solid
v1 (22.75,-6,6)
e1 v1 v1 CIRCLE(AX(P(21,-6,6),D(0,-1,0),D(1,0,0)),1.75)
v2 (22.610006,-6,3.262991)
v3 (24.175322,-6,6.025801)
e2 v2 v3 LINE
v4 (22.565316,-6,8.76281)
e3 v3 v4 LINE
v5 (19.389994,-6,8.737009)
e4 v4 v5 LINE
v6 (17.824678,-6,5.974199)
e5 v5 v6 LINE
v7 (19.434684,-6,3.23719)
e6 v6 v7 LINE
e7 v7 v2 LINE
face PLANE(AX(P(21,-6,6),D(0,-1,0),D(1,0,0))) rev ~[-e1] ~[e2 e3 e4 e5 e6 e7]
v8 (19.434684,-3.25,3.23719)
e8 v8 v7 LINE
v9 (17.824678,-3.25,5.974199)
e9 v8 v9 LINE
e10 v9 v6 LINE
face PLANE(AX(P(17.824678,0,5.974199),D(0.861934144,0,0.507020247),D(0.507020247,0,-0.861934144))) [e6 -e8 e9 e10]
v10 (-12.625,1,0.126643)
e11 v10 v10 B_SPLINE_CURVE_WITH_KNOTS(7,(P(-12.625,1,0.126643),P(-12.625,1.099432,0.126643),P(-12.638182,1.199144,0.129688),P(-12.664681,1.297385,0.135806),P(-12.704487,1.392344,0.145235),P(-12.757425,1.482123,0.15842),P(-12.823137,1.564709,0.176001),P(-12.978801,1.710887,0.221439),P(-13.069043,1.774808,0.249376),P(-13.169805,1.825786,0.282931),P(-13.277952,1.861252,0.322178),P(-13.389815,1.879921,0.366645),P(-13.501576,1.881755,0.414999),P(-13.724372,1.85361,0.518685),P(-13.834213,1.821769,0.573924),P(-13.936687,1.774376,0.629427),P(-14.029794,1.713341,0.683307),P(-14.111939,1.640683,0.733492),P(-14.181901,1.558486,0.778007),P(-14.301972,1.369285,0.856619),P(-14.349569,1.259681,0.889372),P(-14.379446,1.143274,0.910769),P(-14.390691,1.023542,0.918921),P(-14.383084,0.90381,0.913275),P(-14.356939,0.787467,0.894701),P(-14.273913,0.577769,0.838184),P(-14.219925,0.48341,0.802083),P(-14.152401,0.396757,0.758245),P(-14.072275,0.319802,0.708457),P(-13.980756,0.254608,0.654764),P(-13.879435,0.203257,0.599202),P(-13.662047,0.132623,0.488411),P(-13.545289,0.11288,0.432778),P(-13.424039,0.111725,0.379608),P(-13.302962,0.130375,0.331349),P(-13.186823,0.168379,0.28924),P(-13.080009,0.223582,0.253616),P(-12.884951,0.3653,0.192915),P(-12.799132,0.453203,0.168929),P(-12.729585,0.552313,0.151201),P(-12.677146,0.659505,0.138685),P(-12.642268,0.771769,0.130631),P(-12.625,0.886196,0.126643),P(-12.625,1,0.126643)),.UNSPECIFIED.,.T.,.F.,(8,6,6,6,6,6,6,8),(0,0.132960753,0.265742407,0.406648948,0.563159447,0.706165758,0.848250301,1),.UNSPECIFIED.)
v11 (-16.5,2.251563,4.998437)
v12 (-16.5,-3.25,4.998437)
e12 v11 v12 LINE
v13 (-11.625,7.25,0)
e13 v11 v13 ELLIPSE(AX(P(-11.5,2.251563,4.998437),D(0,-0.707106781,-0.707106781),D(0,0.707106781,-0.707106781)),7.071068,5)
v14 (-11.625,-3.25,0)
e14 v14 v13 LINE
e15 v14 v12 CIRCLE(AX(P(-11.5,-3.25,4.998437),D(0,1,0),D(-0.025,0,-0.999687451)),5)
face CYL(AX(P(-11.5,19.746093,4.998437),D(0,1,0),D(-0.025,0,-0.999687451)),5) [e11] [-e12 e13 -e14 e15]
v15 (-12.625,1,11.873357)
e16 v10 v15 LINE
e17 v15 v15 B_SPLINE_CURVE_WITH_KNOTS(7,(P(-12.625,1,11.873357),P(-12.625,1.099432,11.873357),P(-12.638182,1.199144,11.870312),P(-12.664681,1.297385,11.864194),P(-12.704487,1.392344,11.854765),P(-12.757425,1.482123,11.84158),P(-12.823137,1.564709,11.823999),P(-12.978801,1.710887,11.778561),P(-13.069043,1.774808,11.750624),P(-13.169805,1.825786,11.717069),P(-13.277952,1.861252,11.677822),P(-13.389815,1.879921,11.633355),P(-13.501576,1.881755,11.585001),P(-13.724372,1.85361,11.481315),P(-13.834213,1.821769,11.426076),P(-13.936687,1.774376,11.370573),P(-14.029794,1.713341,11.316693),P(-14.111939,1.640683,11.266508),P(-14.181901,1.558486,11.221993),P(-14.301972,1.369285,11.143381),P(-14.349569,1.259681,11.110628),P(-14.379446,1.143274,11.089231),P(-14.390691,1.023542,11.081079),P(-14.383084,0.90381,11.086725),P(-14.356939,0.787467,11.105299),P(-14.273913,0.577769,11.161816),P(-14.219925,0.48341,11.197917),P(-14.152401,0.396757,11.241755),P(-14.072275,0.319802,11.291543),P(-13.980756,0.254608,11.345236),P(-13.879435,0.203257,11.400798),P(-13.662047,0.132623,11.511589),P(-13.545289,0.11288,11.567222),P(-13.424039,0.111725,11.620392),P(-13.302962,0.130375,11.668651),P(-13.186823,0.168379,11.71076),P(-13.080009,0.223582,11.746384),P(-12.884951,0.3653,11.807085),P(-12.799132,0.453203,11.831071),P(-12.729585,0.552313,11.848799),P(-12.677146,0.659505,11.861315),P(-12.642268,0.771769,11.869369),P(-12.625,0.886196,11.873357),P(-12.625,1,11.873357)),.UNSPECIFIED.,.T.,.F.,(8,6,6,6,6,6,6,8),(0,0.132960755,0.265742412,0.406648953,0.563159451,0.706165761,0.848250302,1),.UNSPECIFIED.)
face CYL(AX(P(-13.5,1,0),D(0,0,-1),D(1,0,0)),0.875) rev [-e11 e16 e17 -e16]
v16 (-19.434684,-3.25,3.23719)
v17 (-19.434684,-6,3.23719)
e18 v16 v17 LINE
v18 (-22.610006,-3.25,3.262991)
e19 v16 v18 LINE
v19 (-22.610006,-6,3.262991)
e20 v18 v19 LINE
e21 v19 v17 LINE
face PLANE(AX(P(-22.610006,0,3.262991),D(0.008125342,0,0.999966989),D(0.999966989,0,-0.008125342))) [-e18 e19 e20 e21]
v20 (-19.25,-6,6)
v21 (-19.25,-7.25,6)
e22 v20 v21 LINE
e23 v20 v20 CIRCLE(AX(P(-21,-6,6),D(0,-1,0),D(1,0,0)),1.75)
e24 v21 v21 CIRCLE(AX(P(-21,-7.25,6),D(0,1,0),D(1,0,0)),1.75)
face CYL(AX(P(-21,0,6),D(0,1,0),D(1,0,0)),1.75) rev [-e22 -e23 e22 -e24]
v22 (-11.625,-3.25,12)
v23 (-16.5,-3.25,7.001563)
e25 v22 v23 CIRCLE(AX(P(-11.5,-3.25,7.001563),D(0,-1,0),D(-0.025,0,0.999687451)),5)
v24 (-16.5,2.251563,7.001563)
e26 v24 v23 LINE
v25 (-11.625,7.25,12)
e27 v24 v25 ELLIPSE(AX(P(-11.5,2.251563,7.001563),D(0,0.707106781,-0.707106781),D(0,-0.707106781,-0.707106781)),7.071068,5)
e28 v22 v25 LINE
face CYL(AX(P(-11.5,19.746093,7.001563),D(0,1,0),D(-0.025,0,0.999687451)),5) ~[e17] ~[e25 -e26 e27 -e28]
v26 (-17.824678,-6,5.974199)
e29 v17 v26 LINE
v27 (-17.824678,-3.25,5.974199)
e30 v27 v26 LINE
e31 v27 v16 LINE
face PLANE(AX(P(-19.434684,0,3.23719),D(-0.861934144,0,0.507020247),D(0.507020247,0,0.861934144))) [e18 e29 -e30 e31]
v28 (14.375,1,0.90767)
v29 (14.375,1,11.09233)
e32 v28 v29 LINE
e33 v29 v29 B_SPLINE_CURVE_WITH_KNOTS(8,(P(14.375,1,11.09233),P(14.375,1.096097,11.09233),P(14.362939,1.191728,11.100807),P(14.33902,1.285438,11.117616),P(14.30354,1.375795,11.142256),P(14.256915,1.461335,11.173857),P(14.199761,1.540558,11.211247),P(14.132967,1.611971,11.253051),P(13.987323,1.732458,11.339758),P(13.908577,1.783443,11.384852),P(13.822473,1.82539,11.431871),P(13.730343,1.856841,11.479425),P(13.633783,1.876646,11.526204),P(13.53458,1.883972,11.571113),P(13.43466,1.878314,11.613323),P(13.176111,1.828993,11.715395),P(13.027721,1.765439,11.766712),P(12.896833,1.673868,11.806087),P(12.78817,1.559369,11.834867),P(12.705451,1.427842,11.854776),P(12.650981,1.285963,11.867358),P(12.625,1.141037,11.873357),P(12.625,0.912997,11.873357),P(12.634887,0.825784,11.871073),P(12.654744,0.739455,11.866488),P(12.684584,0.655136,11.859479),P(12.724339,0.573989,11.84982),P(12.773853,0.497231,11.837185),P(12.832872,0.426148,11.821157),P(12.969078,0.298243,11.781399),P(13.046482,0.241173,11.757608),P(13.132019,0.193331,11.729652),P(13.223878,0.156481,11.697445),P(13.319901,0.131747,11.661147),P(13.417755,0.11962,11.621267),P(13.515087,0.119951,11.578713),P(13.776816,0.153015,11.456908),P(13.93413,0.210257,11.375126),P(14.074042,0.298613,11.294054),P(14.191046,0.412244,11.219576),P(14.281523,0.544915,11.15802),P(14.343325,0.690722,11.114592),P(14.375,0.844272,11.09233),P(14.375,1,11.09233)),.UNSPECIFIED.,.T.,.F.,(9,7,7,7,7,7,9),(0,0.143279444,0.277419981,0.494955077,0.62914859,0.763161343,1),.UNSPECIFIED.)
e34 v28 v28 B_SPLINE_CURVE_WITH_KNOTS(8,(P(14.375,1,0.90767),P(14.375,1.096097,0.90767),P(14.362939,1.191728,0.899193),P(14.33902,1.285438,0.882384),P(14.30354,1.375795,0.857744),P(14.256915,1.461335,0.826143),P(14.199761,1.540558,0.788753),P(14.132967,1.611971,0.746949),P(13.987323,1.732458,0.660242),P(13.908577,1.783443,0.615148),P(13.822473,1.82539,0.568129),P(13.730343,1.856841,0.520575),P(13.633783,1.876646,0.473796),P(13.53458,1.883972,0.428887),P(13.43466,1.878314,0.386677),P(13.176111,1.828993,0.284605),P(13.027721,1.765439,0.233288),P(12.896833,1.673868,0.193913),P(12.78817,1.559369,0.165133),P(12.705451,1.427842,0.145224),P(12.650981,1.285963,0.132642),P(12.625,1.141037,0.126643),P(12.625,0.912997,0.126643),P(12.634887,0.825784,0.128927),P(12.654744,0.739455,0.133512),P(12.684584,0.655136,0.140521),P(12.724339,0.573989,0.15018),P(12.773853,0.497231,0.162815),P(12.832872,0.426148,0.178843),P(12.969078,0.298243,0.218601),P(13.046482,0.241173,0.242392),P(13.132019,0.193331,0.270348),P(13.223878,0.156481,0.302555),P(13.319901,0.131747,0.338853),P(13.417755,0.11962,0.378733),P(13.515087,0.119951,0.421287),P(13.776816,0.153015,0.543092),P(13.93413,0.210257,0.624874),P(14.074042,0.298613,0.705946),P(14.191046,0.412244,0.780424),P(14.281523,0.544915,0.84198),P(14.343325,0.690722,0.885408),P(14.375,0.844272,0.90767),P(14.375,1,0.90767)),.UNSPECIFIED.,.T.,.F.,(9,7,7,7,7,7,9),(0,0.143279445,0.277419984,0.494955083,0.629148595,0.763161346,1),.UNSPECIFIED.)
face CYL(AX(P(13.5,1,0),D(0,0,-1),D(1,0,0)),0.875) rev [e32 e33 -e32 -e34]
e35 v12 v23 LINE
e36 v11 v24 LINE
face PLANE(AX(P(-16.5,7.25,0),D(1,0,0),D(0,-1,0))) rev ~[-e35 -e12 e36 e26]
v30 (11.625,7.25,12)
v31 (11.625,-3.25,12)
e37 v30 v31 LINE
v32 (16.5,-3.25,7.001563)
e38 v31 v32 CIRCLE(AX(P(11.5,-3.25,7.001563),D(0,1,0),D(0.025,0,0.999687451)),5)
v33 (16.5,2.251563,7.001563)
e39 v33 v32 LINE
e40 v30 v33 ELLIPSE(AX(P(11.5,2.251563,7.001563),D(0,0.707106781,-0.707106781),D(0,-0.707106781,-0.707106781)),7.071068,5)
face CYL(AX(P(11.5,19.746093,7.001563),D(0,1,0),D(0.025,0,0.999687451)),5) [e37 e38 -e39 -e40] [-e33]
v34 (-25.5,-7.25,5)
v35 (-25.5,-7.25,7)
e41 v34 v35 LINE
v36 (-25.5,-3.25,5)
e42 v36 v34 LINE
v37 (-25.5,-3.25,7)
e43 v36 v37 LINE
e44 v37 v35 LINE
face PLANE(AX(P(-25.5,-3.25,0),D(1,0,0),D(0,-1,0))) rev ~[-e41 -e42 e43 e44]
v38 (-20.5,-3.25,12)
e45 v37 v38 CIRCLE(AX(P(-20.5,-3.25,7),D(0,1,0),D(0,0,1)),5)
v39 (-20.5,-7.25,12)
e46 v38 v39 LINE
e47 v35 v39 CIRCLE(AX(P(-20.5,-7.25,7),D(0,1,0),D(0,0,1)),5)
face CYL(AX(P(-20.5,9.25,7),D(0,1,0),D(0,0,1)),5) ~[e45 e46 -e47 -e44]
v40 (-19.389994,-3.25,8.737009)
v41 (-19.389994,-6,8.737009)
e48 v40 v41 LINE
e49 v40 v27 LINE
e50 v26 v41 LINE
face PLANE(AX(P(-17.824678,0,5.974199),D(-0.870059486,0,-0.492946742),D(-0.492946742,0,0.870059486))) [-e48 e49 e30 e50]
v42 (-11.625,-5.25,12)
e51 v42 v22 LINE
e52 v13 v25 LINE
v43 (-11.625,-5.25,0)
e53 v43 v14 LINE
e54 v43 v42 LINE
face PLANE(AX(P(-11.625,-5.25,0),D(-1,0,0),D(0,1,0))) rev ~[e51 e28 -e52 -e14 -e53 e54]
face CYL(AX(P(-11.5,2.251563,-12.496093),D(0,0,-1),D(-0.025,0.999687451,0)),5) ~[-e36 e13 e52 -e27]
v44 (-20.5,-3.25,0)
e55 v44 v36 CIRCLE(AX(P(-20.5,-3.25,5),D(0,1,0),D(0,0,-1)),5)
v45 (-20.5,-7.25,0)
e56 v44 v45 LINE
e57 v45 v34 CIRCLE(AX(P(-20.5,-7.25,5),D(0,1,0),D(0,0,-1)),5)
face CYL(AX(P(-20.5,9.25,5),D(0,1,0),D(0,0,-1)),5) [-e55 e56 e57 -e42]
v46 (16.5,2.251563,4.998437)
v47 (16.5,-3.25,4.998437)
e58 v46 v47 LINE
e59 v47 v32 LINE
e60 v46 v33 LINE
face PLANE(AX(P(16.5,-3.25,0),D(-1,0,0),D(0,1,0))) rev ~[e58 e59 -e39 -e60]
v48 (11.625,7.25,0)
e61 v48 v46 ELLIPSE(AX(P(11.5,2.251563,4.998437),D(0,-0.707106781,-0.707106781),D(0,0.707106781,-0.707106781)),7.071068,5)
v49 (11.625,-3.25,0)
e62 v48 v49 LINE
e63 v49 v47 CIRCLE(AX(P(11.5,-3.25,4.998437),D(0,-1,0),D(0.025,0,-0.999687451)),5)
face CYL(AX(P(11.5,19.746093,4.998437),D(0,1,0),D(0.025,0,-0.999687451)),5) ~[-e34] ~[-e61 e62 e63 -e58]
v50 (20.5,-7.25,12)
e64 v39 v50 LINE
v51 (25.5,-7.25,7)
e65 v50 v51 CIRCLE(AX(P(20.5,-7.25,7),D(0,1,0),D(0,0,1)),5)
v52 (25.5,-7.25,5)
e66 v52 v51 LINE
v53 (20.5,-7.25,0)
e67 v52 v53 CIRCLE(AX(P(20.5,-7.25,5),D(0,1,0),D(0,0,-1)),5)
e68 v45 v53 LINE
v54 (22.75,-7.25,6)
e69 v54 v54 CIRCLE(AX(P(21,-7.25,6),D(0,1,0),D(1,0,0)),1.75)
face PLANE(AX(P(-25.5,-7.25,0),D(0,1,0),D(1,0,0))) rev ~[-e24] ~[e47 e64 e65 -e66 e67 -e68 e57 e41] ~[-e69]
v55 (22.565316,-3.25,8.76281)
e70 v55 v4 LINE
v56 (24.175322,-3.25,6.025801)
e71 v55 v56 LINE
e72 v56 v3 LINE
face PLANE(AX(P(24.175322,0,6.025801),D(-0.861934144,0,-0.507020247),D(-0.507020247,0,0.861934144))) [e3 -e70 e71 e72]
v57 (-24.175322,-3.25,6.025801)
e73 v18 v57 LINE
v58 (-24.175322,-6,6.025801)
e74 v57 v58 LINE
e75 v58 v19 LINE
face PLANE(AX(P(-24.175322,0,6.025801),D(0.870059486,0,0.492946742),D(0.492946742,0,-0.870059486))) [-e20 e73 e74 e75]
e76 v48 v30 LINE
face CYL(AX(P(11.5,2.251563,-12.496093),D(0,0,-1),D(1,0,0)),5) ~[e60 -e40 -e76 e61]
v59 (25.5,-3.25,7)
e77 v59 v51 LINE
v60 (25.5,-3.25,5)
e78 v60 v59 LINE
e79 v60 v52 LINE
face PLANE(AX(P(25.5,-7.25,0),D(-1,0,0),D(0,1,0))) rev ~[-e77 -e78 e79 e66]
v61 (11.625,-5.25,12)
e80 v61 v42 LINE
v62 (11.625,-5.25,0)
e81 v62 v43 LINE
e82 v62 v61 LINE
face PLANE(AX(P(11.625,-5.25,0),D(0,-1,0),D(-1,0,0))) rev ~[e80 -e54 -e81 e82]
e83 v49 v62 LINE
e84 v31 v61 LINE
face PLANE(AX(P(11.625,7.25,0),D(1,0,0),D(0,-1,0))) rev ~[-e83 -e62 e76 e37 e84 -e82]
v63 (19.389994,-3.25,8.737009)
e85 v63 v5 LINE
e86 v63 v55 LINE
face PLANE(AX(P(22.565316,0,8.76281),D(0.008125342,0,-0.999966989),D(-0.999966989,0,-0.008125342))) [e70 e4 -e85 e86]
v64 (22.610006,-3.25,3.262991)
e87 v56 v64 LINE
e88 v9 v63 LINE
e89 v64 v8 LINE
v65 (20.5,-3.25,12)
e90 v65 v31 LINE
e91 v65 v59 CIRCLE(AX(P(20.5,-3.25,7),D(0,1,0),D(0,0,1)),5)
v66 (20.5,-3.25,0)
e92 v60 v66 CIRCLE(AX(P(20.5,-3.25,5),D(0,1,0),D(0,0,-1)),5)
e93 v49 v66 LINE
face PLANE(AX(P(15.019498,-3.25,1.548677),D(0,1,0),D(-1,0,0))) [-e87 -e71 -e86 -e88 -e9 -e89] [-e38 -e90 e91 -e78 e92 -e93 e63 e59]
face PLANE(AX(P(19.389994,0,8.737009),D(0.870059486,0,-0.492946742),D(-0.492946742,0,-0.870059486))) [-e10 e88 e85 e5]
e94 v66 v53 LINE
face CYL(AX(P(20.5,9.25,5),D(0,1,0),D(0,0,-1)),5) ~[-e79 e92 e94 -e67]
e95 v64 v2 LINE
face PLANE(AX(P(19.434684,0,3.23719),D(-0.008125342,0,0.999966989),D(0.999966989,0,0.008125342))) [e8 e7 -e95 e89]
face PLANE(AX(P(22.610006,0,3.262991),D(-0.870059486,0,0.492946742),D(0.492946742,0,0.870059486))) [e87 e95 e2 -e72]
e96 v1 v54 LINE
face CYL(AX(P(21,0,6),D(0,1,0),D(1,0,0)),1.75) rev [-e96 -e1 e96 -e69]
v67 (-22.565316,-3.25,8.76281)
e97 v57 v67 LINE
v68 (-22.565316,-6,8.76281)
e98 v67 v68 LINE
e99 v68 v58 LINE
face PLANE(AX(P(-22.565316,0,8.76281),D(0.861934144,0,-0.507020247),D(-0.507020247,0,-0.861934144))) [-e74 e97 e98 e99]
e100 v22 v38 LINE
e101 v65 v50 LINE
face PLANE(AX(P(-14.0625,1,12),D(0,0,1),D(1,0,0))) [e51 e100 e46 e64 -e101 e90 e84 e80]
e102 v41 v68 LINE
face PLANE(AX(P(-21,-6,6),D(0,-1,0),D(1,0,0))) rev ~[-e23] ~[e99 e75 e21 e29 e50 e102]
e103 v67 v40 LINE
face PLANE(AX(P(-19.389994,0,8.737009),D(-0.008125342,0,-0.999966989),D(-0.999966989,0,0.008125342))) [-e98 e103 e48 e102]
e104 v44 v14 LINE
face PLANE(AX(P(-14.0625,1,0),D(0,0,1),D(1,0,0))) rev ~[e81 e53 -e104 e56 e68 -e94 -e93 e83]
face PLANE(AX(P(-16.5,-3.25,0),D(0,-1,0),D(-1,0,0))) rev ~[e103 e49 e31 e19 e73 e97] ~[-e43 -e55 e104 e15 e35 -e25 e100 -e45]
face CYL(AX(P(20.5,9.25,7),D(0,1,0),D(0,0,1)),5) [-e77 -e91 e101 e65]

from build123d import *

# Parameters (mm, degrees)
F0_R        = 0.875
F1_DEPTH    = 12
F2_R        = 1.75
F3_DEPTH    = 25
F4_DEPTH    = 6
F5_T1_DEPTH = 36.9921862789
F5_T3_DEPTH = 22.9960931395
F5_T5_DEPTH = 29


# Not quite as in the source:
# - a fillet or chamfer that OpenCascade refuses, or shapes differently, is made with other operations: its cross-section is extruded or revolved along the edge and cut away or added


with BuildPart() as f1:
    # F0 (on Top) → F1 (new body)
    with BuildSketch(Plane.XY):
        Polygon((-11.625, -5.25), (-11.625, 7.25), (-16.5, 7.25), (-16.5, -3.25), (-16.5, -5.25), align=None)
        with Locations((-13.5, 1)):
            Circle(F0_R, mode=Mode.SUBTRACT)
        Polygon((-16.5, -5.25), (-16.5, -3.25), (-25.5, -3.25), (-25.5, -7.25), (-16.5, -7.25), align=None)
        Polygon((16.5, -3.25), (16.5, 7.25), (11.625, 7.25), (11.625, -5.25), (16.5, -5.25), align=None)
        with Locations((13.5, 1)):
            Circle(F0_R, mode=Mode.SUBTRACT)
        Polygon((25.5, -3.25), (16.5, -3.25), (16.5, -5.25), (16.5, -7.25), (25.5, -7.25), align=None)
        Polygon((16.5, -5.25), (11.625, -5.25), (-11.625, -5.25), (-16.5, -5.25), (-16.5, -7.25), (16.5, -7.25), align=None)
    extrude(amount=F1_DEPTH)

    # F2 (on Front) → F3 (cut)
    with BuildSketch(Plane.XZ):
        with Locations((21, 6)):
            Circle(F2_R)
        with Locations((-21, 6)):
            Circle(F2_R)
    extrude(amount=F3_DEPTH, mode=Mode.SUBTRACT)

    # F2 (on Front) → F4 (cut)
    with BuildSketch(Plane.XZ):
        Polygon((17.8246783439, 5.9741985751), (19.4346838614, 3.2371900682), (22.6100055175, 3.2629914931), (24.1753216561, 6.0258014249), (22.5653161386, 8.7628099318), (19.3899944825, 8.7370085069), align=None)
        with Locations((21, 6)):
            Circle(F2_R, mode=Mode.SUBTRACT)
        Polygon((-22.6100055175, 3.2629914931), (-19.4346838614, 3.2371900682), (-17.8246783439, 5.9741985751), (-19.3899944825, 8.7370085069), (-22.5653161386, 8.7628099318), (-24.1753216561, 6.0258014249), align=None)
        with Locations((-21, 6)):
            Circle(F2_R, mode=Mode.SUBTRACT)
    extrude(amount=F4_DEPTH, mode=Mode.SUBTRACT)

    # F5: fillet of radius 5 on 10 edges, made by hand

    # F5_s2 → F5_t1 (cut)
    with BuildSketch(Plane.XY.offset(-12.4960931395)):
        with BuildLine():
            ThreePointArc((-11.625, 7.25), (-15.0794552658, 5.7426227552), (-16.5, 2.2515627442))
            Line((-16.5, 2.2515627442), (-16.5, 7.25))
            Line((-16.5, 7.25), (-11.625, 7.25))
        make_face()
        with BuildLine():
            ThreePointArc((16.5, 2.2515627442), (15.0794552658, 5.7426227552), (11.625, 7.25))
            Line((11.625, 7.25), (16.5, 7.25))
            Line((16.5, 7.25), (16.5, 2.2515627442))
        make_face()
    extrude(amount=F5_T1_DEPTH, mode=Mode.SUBTRACT)

    # F5_s4 → F5_t3 (cut)
    with BuildSketch(Plane.XZ.offset(-19.7460931395)):
        with BuildLine():
            ThreePointArc((11.625, 12), (15.0794552658, 10.4926227552), (16.5, 7.0015627442))
            Line((16.5, 7.0015627442), (16.5, 12))
            Line((16.5, 12), (11.625, 12))
        make_face()
        with BuildLine():
            ThreePointArc((11.625, 0), (15.0794552658, 1.5073772448), (16.5, 4.9984372558))
            Line((16.5, 4.9984372558), (16.5, 0))
            Line((16.5, 0), (11.625, 0))
        make_face()
        with BuildLine():
            ThreePointArc((-11.625, 0), (-15.0794552658, 1.5073772448), (-16.5, 4.9984372558))
            Line((-16.5, 4.9984372558), (-16.5, 0))
            Line((-16.5, 0), (-11.625, 0))
        make_face()
        with BuildLine():
            ThreePointArc((-11.625, 12), (-15.0794552658, 10.4926227552), (-16.5, 7.0015627442))
            Line((-16.5, 7.0015627442), (-16.5, 12))
            Line((-16.5, 12), (-11.625, 12))
        make_face()
    extrude(amount=F5_T3_DEPTH, mode=Mode.SUBTRACT)

    # F5_s6 → F5_t5 (cut)
    with BuildSketch(Plane.XZ.offset(-9.25)):
        with BuildLine():
            ThreePointArc((20.5, 0), (24.0355339059, 1.4644660941), (25.5, 5))
            Line((25.5, 5), (25.5, 0))
            Line((25.5, 0), (20.5, 0))
        make_face()
        with BuildLine():
            ThreePointArc((20.5, 12), (24.0355339059, 10.5355339059), (25.5, 7))
            Line((25.5, 7), (25.5, 12))
            Line((25.5, 12), (20.5, 12))
        make_face()
        with BuildLine():
            ThreePointArc((-20.5, 12), (-24.0355339059, 10.5355339059), (-25.5, 7))
            Line((-25.5, 7), (-25.5, 12))
            Line((-25.5, 12), (-20.5, 12))
        make_face()
        with BuildLine():
            ThreePointArc((-20.5, 0), (-24.0355339059, 1.4644660941), (-25.5, 5))
            Line((-25.5, 5), (-25.5, 0))
            Line((-25.5, 0), (-20.5, 0))
        make_face()
    extrude(amount=F5_T5_DEPTH, mode=Mode.SUBTRACT)


solid = f1.part
